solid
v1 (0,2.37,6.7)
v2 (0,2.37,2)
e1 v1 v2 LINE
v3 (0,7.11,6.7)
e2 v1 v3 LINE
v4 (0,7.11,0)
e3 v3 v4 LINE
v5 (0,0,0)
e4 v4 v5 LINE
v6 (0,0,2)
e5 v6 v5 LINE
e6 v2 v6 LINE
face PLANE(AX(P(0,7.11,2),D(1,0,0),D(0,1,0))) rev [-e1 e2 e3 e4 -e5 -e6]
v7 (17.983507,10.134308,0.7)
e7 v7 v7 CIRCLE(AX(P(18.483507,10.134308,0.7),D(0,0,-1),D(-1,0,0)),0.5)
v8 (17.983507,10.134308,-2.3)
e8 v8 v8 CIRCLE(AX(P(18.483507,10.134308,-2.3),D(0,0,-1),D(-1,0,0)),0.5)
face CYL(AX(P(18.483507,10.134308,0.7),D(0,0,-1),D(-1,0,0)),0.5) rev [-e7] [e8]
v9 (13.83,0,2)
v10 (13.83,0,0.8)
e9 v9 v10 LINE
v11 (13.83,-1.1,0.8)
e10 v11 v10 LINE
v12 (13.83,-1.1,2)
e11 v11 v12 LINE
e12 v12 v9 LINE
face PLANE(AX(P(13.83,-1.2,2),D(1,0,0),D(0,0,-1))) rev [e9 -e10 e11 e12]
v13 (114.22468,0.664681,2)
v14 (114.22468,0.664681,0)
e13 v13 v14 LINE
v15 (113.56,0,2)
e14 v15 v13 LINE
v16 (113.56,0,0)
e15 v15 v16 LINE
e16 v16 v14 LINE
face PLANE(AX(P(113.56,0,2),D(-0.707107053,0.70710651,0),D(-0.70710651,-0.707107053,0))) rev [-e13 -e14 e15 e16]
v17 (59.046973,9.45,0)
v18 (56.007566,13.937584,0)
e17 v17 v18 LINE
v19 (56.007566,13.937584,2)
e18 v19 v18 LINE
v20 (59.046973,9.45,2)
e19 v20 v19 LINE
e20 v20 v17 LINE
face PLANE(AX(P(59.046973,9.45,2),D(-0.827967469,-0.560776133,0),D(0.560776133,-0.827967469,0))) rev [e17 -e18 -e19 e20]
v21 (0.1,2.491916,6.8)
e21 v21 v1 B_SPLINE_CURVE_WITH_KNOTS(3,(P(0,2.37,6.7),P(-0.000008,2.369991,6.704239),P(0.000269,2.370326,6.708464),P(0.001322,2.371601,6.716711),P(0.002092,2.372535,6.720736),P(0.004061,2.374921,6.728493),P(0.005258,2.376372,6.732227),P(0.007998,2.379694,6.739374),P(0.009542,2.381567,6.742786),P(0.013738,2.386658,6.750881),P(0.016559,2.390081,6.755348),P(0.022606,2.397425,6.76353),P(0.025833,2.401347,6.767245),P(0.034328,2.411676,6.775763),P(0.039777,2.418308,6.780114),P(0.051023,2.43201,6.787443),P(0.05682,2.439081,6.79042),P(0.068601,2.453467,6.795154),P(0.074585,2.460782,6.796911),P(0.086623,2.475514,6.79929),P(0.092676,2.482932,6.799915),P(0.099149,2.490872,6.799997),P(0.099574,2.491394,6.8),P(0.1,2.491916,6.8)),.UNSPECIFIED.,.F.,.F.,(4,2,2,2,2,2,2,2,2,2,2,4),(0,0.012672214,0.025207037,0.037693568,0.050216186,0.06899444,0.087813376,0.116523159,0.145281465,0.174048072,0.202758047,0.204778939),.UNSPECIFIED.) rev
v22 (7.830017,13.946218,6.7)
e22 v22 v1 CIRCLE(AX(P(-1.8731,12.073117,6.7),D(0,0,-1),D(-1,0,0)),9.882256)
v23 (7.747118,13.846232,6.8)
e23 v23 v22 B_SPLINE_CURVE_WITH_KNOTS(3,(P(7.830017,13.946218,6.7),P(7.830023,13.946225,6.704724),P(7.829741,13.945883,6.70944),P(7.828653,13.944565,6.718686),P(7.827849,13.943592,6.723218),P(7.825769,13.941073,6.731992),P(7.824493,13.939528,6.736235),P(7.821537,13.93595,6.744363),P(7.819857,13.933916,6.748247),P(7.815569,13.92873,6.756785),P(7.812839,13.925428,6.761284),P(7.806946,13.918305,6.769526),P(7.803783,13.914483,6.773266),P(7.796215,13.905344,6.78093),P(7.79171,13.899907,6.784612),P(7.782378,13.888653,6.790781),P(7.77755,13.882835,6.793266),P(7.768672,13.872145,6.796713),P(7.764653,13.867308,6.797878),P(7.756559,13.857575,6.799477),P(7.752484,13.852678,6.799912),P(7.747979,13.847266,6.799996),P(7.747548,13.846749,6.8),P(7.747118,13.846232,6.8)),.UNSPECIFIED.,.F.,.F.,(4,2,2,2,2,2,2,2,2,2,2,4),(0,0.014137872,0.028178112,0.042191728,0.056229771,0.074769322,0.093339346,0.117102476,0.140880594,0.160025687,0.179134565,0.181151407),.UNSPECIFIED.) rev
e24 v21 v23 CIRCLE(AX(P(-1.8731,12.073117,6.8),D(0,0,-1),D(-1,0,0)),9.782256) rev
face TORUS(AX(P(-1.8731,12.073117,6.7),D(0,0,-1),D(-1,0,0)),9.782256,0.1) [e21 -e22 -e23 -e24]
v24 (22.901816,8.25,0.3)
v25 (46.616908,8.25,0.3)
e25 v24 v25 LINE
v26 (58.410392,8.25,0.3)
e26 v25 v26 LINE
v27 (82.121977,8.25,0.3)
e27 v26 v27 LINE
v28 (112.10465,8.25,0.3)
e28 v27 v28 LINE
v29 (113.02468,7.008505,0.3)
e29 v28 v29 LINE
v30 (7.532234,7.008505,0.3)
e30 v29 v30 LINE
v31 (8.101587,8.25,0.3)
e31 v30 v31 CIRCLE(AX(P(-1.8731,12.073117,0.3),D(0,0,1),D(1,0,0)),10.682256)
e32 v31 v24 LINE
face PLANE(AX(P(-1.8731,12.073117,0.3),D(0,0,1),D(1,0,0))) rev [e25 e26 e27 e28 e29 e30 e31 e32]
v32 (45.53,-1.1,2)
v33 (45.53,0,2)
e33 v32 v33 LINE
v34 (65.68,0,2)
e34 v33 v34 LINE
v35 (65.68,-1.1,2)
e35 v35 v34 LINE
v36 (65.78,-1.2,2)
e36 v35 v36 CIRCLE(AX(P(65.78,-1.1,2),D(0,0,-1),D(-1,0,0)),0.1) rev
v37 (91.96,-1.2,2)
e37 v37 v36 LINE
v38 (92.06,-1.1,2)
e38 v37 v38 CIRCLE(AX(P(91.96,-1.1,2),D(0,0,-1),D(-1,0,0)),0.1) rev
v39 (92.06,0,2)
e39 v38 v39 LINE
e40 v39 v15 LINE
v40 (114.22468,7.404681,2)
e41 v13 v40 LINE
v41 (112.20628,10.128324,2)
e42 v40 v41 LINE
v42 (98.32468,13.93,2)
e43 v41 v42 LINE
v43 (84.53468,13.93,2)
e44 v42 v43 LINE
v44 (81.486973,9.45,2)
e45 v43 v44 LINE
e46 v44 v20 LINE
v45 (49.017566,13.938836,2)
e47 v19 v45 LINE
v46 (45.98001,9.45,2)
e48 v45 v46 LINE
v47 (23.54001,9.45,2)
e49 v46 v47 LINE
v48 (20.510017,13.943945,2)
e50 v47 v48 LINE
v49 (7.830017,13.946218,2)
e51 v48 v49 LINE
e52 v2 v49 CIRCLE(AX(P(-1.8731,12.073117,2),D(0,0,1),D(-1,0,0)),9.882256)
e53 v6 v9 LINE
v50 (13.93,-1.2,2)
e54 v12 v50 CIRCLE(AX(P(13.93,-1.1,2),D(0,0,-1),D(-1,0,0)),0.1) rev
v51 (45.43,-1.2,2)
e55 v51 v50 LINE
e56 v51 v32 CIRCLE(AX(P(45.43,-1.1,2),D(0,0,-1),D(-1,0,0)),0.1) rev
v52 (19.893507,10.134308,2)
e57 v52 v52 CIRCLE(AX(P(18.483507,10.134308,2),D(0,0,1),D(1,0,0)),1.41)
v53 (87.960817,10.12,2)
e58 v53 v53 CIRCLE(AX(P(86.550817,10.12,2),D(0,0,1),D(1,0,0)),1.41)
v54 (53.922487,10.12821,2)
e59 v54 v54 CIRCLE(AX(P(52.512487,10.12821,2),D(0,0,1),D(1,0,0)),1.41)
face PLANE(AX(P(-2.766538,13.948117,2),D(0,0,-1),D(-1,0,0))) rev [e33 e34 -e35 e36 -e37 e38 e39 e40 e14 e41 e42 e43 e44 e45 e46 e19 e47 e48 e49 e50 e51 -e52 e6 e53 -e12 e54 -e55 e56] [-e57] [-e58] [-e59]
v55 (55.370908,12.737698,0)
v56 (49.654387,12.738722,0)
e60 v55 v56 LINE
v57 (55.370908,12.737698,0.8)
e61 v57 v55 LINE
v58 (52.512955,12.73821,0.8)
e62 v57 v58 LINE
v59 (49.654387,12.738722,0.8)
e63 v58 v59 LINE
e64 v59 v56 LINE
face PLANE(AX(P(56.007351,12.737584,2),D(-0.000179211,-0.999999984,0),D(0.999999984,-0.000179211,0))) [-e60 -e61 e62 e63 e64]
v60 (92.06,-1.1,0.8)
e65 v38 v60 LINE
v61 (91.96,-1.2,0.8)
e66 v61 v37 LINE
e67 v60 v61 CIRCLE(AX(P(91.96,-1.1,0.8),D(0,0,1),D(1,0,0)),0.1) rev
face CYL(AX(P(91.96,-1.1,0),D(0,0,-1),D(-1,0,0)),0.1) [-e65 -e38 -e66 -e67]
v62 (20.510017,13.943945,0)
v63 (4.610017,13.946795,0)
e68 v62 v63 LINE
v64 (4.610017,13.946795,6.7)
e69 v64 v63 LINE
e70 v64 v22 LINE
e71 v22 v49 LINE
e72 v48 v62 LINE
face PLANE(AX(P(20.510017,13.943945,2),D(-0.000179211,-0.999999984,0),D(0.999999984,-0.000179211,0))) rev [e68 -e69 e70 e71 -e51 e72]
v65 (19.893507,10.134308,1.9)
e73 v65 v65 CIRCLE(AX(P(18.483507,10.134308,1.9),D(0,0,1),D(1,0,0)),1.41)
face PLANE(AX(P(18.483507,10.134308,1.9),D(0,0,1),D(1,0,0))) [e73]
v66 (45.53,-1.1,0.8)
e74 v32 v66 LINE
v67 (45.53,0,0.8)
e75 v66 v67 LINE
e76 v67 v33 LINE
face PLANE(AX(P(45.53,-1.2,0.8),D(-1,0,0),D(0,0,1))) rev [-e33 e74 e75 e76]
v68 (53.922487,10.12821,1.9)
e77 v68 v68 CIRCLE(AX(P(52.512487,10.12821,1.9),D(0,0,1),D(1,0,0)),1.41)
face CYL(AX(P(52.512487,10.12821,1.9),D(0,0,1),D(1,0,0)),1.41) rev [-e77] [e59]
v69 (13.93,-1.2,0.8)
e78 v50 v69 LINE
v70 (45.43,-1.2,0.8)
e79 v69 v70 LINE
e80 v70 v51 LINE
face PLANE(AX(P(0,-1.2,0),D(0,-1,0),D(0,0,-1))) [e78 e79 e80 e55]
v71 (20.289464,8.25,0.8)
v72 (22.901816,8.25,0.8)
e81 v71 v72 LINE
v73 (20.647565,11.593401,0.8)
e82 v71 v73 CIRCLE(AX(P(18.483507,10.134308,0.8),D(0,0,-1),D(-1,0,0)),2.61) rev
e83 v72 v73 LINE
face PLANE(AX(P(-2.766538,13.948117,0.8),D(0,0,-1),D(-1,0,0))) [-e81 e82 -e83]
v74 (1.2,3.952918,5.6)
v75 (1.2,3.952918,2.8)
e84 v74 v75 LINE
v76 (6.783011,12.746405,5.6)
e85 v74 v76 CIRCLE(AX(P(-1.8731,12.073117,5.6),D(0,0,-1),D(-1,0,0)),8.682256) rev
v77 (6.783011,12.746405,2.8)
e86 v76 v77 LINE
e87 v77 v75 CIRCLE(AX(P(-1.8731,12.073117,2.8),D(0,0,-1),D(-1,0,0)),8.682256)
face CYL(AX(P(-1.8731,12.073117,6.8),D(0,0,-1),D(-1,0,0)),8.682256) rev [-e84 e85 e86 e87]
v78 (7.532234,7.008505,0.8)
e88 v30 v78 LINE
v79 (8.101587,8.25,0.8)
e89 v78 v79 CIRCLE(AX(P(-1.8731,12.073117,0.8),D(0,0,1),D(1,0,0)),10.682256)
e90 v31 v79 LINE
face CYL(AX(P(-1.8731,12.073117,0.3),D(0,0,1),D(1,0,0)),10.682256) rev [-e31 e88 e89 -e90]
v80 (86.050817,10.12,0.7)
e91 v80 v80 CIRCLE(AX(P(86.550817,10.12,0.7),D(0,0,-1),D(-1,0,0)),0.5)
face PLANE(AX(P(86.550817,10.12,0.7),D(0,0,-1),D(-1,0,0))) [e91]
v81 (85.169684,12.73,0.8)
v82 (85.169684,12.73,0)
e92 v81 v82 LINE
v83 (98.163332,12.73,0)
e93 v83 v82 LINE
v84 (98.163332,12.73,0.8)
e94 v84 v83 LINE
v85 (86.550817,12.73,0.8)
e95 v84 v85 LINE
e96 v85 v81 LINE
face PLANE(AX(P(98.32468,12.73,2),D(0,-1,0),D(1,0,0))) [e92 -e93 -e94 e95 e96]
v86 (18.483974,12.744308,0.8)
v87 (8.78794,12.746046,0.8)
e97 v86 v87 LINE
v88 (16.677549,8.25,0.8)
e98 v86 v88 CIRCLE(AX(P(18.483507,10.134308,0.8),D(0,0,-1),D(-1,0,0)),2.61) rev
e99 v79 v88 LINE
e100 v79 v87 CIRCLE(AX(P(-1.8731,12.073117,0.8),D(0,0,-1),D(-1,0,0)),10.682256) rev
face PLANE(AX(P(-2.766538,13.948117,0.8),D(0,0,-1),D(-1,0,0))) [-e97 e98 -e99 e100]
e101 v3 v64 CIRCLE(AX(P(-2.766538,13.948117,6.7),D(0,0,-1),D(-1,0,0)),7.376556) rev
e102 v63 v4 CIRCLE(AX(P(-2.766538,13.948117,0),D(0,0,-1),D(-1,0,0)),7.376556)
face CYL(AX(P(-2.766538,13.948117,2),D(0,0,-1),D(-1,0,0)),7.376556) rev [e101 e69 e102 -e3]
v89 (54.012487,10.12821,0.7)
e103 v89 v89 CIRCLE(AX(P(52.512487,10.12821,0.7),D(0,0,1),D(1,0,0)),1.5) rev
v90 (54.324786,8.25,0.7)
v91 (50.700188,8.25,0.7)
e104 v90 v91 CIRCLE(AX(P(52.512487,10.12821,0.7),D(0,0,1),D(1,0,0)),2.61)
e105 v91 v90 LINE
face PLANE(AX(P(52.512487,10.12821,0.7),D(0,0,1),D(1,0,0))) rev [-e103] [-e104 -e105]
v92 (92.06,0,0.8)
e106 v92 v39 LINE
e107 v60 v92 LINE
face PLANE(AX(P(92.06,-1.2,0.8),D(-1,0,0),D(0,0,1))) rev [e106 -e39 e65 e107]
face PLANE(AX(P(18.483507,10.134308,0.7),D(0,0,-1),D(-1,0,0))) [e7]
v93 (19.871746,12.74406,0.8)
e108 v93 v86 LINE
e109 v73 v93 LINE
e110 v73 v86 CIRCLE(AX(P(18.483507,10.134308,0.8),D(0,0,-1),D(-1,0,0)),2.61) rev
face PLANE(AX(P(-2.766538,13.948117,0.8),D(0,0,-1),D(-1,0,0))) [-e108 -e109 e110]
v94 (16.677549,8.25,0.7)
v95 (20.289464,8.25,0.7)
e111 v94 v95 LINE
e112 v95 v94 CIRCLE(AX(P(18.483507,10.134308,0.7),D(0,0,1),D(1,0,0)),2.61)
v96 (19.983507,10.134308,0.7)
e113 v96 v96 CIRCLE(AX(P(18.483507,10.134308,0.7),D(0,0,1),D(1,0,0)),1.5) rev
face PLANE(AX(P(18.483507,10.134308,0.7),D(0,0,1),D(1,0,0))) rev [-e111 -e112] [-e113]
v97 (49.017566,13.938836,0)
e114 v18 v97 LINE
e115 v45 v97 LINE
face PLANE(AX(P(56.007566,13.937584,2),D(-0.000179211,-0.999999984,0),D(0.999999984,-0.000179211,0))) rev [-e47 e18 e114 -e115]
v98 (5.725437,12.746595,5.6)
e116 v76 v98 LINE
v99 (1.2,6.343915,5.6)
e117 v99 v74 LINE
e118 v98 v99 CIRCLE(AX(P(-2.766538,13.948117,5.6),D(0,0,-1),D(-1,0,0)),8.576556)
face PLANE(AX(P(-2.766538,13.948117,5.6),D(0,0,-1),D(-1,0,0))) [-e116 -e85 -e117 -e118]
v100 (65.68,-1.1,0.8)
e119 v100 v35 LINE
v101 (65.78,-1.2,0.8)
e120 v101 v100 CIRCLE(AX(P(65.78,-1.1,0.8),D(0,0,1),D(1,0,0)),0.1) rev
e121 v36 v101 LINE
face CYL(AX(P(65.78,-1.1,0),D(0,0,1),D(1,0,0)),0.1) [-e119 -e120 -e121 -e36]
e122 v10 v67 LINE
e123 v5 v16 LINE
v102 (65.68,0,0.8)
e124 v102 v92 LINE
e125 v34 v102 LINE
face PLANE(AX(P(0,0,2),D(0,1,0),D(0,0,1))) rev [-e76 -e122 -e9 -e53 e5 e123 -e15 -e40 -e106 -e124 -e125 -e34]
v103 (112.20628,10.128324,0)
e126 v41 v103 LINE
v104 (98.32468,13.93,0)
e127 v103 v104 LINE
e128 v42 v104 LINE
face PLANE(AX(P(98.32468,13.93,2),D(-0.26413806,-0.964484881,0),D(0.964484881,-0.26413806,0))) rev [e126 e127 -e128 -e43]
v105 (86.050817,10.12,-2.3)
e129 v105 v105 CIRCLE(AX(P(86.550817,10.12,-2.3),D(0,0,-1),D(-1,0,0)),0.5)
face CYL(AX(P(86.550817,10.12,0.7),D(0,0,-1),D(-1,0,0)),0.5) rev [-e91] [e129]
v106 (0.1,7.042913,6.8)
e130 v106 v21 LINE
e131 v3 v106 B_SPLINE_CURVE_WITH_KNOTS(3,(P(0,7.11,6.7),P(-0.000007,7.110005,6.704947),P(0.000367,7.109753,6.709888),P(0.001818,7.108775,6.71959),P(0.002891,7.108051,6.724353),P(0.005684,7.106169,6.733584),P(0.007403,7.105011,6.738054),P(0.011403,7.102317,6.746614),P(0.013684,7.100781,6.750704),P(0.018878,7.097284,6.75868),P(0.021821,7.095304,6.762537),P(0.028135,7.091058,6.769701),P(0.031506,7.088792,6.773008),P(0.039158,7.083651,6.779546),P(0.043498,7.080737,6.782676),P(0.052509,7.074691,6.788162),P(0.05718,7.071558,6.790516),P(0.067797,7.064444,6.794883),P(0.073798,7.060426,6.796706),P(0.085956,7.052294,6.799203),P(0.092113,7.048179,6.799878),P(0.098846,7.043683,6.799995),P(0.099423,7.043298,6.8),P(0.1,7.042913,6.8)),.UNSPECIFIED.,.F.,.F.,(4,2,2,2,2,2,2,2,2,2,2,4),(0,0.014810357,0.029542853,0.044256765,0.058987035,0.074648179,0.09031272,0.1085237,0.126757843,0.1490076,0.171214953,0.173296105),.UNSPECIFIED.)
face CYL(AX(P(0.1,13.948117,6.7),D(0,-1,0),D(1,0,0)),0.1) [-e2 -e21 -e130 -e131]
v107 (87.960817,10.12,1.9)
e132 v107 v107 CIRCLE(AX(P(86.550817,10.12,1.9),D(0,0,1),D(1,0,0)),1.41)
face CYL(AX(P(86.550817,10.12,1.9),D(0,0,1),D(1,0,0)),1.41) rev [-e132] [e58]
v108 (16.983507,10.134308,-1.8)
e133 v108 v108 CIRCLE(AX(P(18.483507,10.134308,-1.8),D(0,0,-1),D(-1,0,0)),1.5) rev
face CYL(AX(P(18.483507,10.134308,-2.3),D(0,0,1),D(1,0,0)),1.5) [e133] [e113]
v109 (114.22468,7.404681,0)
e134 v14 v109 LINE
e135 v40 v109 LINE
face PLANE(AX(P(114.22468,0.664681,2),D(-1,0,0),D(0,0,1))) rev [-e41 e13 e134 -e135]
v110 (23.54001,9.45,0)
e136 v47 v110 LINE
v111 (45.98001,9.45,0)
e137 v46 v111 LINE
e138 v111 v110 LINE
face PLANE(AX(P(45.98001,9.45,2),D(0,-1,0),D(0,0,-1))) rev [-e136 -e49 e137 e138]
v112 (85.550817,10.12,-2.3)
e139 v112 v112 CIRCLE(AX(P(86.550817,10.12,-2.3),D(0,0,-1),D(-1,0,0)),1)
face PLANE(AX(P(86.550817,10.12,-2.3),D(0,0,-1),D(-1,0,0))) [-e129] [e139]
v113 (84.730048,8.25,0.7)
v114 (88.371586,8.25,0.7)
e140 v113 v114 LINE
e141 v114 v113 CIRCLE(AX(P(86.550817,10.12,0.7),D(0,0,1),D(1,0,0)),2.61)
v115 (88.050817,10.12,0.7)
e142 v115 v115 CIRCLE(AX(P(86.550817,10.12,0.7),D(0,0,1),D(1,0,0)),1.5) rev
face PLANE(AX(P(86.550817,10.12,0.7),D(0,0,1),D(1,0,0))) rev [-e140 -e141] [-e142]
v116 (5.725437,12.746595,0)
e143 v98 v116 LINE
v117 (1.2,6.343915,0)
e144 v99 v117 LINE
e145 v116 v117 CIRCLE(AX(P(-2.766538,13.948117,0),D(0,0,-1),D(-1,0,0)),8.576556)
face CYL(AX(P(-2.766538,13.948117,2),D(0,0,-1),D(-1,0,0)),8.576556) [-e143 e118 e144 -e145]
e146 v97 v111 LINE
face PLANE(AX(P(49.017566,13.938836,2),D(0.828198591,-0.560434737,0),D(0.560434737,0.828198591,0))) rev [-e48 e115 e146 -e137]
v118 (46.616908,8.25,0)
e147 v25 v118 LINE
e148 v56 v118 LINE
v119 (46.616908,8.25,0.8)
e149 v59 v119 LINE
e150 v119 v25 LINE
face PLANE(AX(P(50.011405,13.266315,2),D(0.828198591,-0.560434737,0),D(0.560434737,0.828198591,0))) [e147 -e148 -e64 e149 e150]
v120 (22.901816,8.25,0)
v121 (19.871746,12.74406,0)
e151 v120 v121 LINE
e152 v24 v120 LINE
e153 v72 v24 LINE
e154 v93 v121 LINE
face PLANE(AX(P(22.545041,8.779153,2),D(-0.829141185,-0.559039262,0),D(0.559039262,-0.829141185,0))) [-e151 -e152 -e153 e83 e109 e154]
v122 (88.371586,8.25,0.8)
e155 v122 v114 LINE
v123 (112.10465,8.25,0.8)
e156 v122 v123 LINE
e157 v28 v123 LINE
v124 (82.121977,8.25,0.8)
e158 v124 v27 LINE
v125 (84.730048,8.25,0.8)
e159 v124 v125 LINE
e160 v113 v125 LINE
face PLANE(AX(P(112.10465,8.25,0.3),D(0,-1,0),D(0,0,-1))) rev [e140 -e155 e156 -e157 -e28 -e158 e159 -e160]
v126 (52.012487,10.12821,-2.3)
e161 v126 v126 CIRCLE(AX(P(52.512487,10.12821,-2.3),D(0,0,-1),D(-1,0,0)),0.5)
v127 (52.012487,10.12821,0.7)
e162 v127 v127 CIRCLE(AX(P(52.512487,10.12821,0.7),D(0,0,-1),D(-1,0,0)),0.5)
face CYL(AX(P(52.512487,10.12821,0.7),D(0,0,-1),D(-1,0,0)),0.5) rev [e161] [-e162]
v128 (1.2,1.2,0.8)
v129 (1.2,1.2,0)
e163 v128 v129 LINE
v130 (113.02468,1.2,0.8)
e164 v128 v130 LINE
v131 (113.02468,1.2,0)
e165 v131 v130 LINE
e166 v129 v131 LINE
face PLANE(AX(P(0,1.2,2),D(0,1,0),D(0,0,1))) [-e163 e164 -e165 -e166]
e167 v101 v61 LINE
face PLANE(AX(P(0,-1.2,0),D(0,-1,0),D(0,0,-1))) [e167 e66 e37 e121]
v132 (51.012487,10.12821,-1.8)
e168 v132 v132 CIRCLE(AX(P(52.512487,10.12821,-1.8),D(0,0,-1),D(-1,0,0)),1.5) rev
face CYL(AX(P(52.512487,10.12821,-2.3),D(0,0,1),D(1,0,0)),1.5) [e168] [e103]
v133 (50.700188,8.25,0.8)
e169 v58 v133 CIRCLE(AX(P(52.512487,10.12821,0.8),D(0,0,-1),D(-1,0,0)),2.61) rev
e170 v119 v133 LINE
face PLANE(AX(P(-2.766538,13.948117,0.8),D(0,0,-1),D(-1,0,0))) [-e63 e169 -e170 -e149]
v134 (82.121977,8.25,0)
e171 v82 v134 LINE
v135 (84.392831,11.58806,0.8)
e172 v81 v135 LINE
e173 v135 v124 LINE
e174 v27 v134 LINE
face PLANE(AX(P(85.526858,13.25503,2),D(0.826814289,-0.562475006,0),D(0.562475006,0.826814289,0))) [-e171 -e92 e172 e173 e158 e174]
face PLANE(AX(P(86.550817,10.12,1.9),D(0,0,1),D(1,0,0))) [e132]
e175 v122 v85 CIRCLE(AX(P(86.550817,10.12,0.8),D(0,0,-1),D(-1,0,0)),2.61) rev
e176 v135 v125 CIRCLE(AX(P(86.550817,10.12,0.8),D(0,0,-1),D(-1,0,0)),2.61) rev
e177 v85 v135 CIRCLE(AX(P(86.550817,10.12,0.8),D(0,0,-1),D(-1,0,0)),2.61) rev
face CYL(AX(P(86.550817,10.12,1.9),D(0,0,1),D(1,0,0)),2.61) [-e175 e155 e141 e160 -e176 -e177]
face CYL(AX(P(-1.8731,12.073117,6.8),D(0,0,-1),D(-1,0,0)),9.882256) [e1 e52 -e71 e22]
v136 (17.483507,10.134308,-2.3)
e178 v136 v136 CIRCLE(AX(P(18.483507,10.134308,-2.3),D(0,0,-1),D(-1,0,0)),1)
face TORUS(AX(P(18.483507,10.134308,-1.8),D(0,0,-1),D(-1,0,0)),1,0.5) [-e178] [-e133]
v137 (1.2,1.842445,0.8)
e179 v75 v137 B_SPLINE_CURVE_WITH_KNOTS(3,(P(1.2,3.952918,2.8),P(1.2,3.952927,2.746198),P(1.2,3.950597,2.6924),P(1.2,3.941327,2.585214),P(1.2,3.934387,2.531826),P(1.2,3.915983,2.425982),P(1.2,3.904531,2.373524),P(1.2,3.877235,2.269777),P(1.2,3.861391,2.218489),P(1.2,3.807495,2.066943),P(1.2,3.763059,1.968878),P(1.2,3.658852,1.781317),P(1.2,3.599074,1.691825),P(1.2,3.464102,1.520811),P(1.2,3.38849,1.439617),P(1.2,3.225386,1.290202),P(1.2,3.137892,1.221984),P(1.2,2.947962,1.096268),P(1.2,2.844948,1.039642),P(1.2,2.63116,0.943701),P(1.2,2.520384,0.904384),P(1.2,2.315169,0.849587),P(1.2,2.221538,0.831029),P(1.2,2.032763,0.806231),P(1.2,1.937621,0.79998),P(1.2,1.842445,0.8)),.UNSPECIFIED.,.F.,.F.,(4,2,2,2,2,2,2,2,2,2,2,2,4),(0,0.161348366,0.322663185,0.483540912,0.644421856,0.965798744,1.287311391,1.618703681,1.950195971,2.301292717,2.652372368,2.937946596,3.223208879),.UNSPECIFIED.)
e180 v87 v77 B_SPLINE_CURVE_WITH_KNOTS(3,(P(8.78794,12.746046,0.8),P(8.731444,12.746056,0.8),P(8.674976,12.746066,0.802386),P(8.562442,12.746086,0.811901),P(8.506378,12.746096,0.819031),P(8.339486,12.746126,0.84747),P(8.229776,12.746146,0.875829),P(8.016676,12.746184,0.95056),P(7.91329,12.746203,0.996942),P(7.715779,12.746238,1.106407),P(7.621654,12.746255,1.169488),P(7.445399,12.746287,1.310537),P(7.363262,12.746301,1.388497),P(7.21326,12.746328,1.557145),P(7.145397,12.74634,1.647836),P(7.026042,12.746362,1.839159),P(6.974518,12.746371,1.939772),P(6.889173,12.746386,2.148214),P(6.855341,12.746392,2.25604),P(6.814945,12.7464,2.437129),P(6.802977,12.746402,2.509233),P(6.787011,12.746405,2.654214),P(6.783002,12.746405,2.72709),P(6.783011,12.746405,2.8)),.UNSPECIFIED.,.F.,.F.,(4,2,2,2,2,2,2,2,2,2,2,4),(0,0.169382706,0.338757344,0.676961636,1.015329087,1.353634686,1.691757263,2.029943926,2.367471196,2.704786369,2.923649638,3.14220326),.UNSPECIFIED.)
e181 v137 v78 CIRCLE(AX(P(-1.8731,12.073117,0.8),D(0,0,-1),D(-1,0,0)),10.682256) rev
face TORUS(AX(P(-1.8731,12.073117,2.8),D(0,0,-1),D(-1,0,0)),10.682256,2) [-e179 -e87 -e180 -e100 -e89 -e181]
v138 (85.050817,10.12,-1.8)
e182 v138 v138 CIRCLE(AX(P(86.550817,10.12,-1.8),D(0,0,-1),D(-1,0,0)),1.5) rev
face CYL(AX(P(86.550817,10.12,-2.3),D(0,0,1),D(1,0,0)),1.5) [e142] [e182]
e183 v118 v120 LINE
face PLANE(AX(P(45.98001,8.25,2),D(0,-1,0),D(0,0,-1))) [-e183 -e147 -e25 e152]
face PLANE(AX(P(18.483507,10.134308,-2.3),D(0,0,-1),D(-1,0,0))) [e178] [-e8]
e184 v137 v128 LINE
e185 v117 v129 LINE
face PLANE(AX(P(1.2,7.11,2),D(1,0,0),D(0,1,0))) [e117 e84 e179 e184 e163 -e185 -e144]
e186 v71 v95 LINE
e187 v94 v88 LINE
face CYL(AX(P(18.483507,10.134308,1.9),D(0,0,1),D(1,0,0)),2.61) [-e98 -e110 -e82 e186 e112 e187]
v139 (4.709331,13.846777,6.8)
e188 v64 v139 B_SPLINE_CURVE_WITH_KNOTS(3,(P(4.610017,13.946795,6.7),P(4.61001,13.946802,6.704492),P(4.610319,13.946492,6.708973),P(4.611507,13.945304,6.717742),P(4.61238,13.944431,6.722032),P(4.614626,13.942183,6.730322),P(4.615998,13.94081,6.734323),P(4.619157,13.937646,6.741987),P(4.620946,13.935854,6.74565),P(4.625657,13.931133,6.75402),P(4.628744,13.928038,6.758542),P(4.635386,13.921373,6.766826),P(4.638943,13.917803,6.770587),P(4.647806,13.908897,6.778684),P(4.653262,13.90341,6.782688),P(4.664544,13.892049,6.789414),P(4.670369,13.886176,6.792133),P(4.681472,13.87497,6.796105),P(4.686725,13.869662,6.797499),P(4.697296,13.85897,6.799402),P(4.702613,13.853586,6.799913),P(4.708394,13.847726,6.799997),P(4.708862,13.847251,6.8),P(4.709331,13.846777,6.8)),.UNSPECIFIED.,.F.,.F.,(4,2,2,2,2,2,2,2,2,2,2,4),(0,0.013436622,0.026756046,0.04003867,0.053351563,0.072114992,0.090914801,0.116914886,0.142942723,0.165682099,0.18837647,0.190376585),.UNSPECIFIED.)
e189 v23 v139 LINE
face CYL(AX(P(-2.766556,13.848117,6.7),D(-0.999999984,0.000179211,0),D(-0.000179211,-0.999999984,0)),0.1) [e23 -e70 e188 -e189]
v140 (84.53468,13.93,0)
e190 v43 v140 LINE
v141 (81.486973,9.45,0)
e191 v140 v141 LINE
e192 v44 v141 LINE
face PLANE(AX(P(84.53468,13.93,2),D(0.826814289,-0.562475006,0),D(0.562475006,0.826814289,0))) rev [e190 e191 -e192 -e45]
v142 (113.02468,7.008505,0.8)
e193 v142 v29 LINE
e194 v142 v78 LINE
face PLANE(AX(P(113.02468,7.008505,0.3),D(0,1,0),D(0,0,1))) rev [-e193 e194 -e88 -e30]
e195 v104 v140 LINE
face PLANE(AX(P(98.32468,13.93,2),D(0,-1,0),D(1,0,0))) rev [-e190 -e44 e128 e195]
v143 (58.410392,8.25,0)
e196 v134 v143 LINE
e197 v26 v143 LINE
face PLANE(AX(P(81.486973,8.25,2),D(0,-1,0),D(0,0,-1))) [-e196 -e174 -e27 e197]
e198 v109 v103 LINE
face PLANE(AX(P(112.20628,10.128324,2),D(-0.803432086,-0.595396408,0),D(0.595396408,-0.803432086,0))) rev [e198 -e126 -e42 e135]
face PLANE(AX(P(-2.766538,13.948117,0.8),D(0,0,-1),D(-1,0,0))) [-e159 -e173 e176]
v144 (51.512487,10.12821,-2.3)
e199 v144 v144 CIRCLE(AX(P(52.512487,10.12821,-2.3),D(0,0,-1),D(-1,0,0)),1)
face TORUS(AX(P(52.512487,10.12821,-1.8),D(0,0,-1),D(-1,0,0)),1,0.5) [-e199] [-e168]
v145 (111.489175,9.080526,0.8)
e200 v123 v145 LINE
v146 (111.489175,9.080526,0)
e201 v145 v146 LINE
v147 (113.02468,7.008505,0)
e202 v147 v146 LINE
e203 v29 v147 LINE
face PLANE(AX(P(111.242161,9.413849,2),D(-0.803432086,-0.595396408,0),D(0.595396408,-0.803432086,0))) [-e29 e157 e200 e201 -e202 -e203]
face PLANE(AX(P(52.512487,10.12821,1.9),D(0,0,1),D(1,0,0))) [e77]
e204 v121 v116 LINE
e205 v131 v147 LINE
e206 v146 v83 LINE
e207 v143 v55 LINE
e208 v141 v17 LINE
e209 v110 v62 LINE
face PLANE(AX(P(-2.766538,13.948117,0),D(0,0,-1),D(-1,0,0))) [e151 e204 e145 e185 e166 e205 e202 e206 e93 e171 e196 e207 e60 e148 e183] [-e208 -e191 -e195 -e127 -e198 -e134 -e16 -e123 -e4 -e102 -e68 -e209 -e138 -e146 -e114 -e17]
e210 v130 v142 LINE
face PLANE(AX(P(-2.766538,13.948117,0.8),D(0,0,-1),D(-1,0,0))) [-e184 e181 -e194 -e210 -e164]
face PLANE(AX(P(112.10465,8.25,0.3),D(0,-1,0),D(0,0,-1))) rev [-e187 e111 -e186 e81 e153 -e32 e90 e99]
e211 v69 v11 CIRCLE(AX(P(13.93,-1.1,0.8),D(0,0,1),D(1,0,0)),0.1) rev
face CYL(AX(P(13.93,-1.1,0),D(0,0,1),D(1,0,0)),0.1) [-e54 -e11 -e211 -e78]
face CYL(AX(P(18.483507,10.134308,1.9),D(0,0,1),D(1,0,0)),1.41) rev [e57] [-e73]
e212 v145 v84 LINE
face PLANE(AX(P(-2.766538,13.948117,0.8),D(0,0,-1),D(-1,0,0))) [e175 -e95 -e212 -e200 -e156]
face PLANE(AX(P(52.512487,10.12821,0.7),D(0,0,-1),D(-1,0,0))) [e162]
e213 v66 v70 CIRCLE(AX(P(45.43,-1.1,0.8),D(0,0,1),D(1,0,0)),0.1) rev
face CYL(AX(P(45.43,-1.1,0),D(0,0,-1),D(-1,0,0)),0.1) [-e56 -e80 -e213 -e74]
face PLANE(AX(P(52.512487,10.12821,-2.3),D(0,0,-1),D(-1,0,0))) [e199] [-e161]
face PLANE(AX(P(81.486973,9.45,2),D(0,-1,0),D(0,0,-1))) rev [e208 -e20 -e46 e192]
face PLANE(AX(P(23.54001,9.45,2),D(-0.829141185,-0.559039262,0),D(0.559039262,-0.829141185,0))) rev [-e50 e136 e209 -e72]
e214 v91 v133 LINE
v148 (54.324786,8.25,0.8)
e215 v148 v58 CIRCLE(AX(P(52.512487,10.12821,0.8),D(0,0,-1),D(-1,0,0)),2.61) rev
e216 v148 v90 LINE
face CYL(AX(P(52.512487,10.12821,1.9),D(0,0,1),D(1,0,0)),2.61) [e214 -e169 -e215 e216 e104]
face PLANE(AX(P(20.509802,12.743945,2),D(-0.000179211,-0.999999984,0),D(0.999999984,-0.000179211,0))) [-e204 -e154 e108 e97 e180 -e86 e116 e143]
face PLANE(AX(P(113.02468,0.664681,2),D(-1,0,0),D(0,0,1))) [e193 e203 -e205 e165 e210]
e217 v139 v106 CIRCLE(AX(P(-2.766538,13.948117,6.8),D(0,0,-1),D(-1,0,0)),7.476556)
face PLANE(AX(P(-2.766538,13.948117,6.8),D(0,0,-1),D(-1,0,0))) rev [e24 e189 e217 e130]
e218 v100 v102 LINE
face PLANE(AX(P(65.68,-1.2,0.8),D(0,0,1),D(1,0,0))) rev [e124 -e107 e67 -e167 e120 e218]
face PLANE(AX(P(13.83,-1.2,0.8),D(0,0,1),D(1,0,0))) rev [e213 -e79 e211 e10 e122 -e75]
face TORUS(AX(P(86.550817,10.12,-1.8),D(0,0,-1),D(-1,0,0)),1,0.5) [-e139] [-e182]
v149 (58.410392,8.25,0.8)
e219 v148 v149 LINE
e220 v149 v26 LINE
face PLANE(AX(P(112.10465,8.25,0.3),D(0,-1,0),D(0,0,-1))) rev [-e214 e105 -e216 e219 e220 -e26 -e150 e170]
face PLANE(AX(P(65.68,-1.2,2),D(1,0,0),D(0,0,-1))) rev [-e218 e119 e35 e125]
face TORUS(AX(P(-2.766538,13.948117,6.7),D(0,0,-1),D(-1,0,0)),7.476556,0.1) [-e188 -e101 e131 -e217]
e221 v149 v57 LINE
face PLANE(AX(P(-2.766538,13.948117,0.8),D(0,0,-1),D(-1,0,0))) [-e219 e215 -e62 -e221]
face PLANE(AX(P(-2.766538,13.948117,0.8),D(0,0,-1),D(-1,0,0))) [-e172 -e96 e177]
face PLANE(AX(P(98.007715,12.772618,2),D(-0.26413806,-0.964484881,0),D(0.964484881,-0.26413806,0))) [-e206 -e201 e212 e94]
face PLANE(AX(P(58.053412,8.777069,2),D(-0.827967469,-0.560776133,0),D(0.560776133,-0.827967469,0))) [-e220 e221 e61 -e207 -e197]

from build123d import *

# Parameters (mm, degrees)
BOSS_EXTRUDE1_DEPTH  = 2
SKETCH6_W            = 31.7
SKETCH6_H            = 1.1999999999999997
BOSS_EXTRUDE2_DEPTH  = 1.2
BOSS_EXTRUDE3_DEPTH  = 1.2
SKETCH4_R            = 1.4099999999999993
SKETCH4_R_2          = 1.4100000000000028
SKETCH4_R_3          = 1.409999999999999
CUT_EXTRUDE6_DEPTH   = 0.1
BOSS_EXTRUDE11_DEPTH = 4.8
SHELL10_DEPTH        = 0.8
SHELL10_START        = 0.8
SHELL10_2_DEPTH      = 4.8
SHELL10_3_OUTLINE_R  = 2.61
SHELL10_3_DEPTH      = 0.7
FILLET2_R            = 2
BOSS_EXTRUDE12_DEPTH = 0.5
SKETCH27_R           = 1.5000000000000042
BOSS_EXTRUDE13_DEPTH = 3
FILLET3_R            = 0.5
SKETCH32_R           = 1.4999999999999973
BOSS_EXTRUDE14_DEPTH = 3
FILLET4_R            = 0.5
SKETCH33_R           = 1.5000000000000009
BOSS_EXTRUDE15_DEPTH = 3
FILLET5_R            = 0.5
SKETCH34_R           = 0.49999999999999917
CUT_EXTRUDE7_DEPTH   = 3
SKETCH35_R           = 0.49999999999999917
CUT_EXTRUDE8_DEPTH   = 3
SKETCH36_R           = 0.49999999999999917
CUT_EXTRUDE9_DEPTH   = 3
FILLET7_R            = 0.1
FILLET8_R            = 0.1
FILLET9_R            = 0.1
FILLET10_R           = 0.1
FILLET11_R           = 0.1


with BuildPart() as part:
    # Sketch1 → Boss-Extrude1 (new body)
    with BuildSketch(Plane.XY):
        with BuildLine():
            Line((0, 0), (113.56, 0))
            Line((113.56, 0), (114.2246801189894, 0.6646806296412225))
            Line((114.2246801189894, 0.6646806296412225), (114.2246801189894, 7.4046806296412235))
            Line((114.2246801189894, 7.4046806296412235), (112.20627968421682, 10.128324324324318))
            Line((112.20627968421682, 10.128324324324318), (98.32468037431536, 13.93))
            Line((98.32468037431536, 13.93), (84.53468037431537, 13.930000000000003))
            Line((84.53468037431537, 13.930000000000003), (81.48697297298213, 9.450000000000003))
            Line((81.48697297298213, 9.450000000000003), (59.046972972982125, 9.450000000000003))
            Line((59.046972972982125, 9.450000000000003), (56.00756633365256, 13.93758367953171))
            Line((56.00756633365256, 13.93758367953171), (49.017566333652546, 13.938836362308603))
            Line((49.017566333652546, 13.938836362308603), (45.980010060525075, 9.450000000000003))
            Line((45.980010060525075, 9.450000000000003), (23.54001006052507, 9.450000000000003))
            Line((23.54001006052507, 9.450000000000003), (20.510017262013168, 13.94394522006733))
            Line((20.510017262013168, 13.94394522006733), (4.610017262013166, 13.946794670160694))
            ThreePointArc((4.610017262013166, 13.946794670160694), (3.3495085223409222, 9.824096158647764), (-8e-17, 7.11))
            Line((-8e-17, 7.11), (0, 0))
        make_face()
    extrude(amount=BOSS_EXTRUDE1_DEPTH)

    # Sketch6 → Boss-Extrude2 (add)
    with BuildSketch(Plane.XZ):
        with Locations((29.68, 1.4000000000000001)):
            Rectangle(SKETCH6_W, SKETCH6_H)
    extrude(amount=BOSS_EXTRUDE2_DEPTH)

    # Sketch7 → Boss-Extrude3 (add)
    with BuildSketch(Plane(origin=(0, 0, 0), x_dir=(-1, 0, 0), z_dir=(0, -1, 0))):
        Polygon((-65.68, -2), (-92.06, -2), (-92.06, -0.8000000000000034), (-65.68, -0.8000000000000002), align=None)
    extrude(amount=BOSS_EXTRUDE3_DEPTH)

    # Sketch4 → Cut-Extrude6 (cut)
    with BuildSketch(Plane.XY.offset(2)):
        with Locations((52.51248680065845, 10.128209973991437)):
            Circle(SKETCH4_R)
        with Locations((18.483506653624264, 10.134308331265466)):
            Circle(SKETCH4_R_2)
        with Locations((86.55081658593453, 10.120000000000001)):
            Circle(SKETCH4_R_3)
    extrude(amount=-CUT_EXTRUDE6_DEPTH, mode=Mode.SUBTRACT)

    # Sketch18 → Boss-Extrude11 (add)
    with BuildSketch(Plane.XY.offset(2)):
        with BuildLine():
            Line((4.610017262013166, 13.946794670160694), (7.8300172620131665, 13.946217611714113))
            ThreePointArc((7.8300172620131665, 13.946217611714113), (6.3125217988837115, 6.53645913408641), (8.7e-16, 2.3700000000000006))
            Line((8.7e-16, 2.3700000000000006), (8.7e-16, 7.110000000000001))
            ThreePointArc((8.7e-16, 7.110000000000001), (3.3495085223409227, 9.824096158647766), (4.610017262013166, 13.946794670160694))
        make_face()
    extrude(amount=BOSS_EXTRUDE11_DEPTH)

    # Shell10: read off the stored shape, not the designer's step
    # Shell10 outline → Shell10 (cut)
    # profile 1 of 4: a face of its own
    with BuildSketch(Plane.XY):
        with BuildLine():
            Line((52.512954541, 12.738209932), (49.654387443, 12.738722218))
            Line((49.654387443, 12.738722218), (46.61690841, 8.25))
            Line((46.61690841, 8.25), (22.901816113, 8.25))
            Line((22.901816113, 8.25), (20.647565145, 11.593400804))
            ThreePointArc((20.647565145, 11.593400804), (20.979532762, 10.89716721), (21.093506654, 10.134308331))
            ThreePointArc((21.093506654, 10.134308331), (16.637792591, 8.288925011), (18.483974394, 12.744308289))
            Line((18.483974394, 12.744308289), (6.783010982, 12.746405227))
            ThreePointArc((6.783010982, 12.746405227), (5.456630529, 7.419449569), (1.2, 3.952918417))
            Line((1.2, 3.952918417), (1.2, 1.2))
            Line((1.2, 1.2), (113.024680119, 1.2))
            Line((113.024680119, 1.2), (113.024680119, 7.008505085))
            Line((113.024680119, 7.008505085), (111.489175152, 9.080526251))
            Line((111.489175152, 9.080526251), (98.163332392, 12.73))
            Line((98.163332392, 12.73), (86.550816586, 12.73))
            ThreePointArc((86.550816586, 12.73), (88.396365285, 11.965548699), (89.160816586, 10.12))
            ThreePointArc((89.160816586, 10.12), (85.782780654, 7.625562026), (84.392831293, 11.588059766))
            Line((84.392831293, 11.588059766), (82.121976504, 8.25))
            Line((82.121976504, 8.25), (58.410391633, 8.25))
            Line((58.410391633, 8.25), (55.37090773, 12.737697756))
            Line((55.37090773, 12.737697756), (52.512954541, 12.738209932))
        make_face()
        with BuildLine():
            ThreePointArc((55.122486801, 10.128209974), (50.666772738, 8.282826654), (52.512954541, 12.738209932))
            ThreePointArc((52.512954541, 12.738209932), (54.358200863, 11.973593294), (55.122486801, 10.128209974))
        make_face(mode=Mode.SUBTRACT)
    # profile 2 of 4: a face of its own
    with BuildSketch(Plane.XY):
        with BuildLine():
            ThreePointArc((18.483974394, 12.744308289), (19.709247434, 12.438578181), (20.647565145, 11.593400804))
            Line((20.647565145, 11.593400804), (19.871746204, 12.744059586))
            Line((19.871746204, 12.744059586), (18.483974394, 12.744308289))
        make_face()
    # profile 3 of 4: a face of its own
    with BuildSketch(Plane.XY):
        with BuildLine():
            Line((85.169683906, 12.73), (84.392831293, 11.588059766))
            ThreePointArc((84.392831293, 11.588059766), (85.330065995, 12.426917422), (86.550816586, 12.73))
            Line((86.550816586, 12.73), (85.169683906, 12.73))
        make_face()
    # profile 4 of 4: a face of its own
    with BuildSketch(Plane.XY):
        with BuildLine():
            ThreePointArc((1.2, 3.952918417), (5.456630529, 7.419449569), (6.783010982, 12.746405227))
            Line((6.783010982, 12.746405227), (5.725437473, 12.746594756))
            ThreePointArc((5.725437473, 12.746594756), (4.237190705, 8.997855303), (1.2, 6.34391511))
            Line((1.2, 6.34391511), (1.2, 3.952918417))
        make_face()
    extrude(amount=SHELL10_DEPTH, mode=Mode.SUBTRACT)

    # Shell10 2 outline → Shell10 2 (cut)
    with BuildSketch(Plane.XY.offset(SHELL10_START)):
        with BuildLine():
            ThreePointArc((1.2, 3.952918417), (5.456630529, 7.419449569), (6.783010982, 12.746405227))
            Line((6.783010982, 12.746405227), (5.725437473, 12.746594756))
            ThreePointArc((5.725437473, 12.746594756), (4.237190705, 8.997855303), (1.2, 6.34391511))
            Line((1.2, 6.34391511), (1.2, 3.952918417))
        make_face()
    extrude(amount=SHELL10_2_DEPTH, mode=Mode.SUBTRACT)

    # Shell10 3 outline → Shell10 3 (cut)
    with BuildSketch(Plane.XY):
        with Locations((52.512486801, 10.128209974)):
            Circle(SHELL10_3_OUTLINE_R)
        with Locations((18.483506654, 10.134308331)):
            Circle(SHELL10_3_OUTLINE_R)
        with Locations((86.550816586, 10.12)):
            Circle(SHELL10_3_OUTLINE_R)
    extrude(amount=SHELL10_3_DEPTH, mode=Mode.SUBTRACT)

    # Fillet2
    fillet2_edges = [part.edges().sort_by_distance(p)[0] for p in [
        (5.456630529005078, 7.419449569008004, 0.8),
    ]]
    fillet(fillet2_edges, radius=FILLET2_R)

    # Sketch19 → Boss-Extrude12 (add)
    with BuildSketch(Plane(origin=(0, 0, 0.8000000000000002), x_dir=(-1, 0, 0), z_dir=(0, 0, -1))):
        with BuildLine():
            Line((-112.10465013060012, 8.250000000000004), (-113.0246801189894, 7.008505084706755))
            Line((-113.0246801189894, 7.008505084706755), (-7.532233645801631, 7.008505084706755))
            ThreePointArc((-7.532233645801631, 7.008505084706755), (-7.836772464238917, 7.620143611633395), (-8.101586568073918, 8.250000000000004))
            Line((-8.101586568073918, 8.250000000000004), (-112.10465013060012, 8.250000000000004))
        make_face()
    extrude(amount=BOSS_EXTRUDE12_DEPTH)

    # Sketch27 → Boss-Extrude13 (add)
    with BuildSketch(Plane(origin=(0, 0, 0.7000000000000001), x_dir=(-1, 0, 0), z_dir=(0, 0, -1))):
        with Locations(Location((-52.51248680065845, 10.128209973991437, 0), (0, 0, 180))):
            Circle(SKETCH27_R)
    extrude(amount=BOSS_EXTRUDE13_DEPTH)

    # Fillet3
    fillet3_edges = [part.edges().sort_by_distance(p)[0] for p in [
        (51.01248680065844, 10.128209973991437, -2.3),
    ]]
    fillet(fillet3_edges, radius=FILLET3_R)

    # Sketch32 → Boss-Extrude14 (add)
    with BuildSketch(Plane(origin=(0, 0, 0.7000000000000001), x_dir=(-1, 0, 0), z_dir=(0, 0, -1))):
        with Locations(Location((-86.55081658593453, 10.120000000000001, 0), (0, 0, 180))):
            Circle(SKETCH32_R)
    extrude(amount=BOSS_EXTRUDE14_DEPTH)

    # Fillet4
    fillet4_edges = [part.edges().sort_by_distance(p)[0] for p in [
        (85.05081658593453, 10.120000000000001, -2.3),
    ]]
    fillet(fillet4_edges, radius=FILLET4_R)

    # Sketch33 → Boss-Extrude15 (add)
    with BuildSketch(Plane(origin=(0, 0, 0.7000000000000001), x_dir=(-1, 0, 0), z_dir=(0, 0, -1))):
        with Locations(Location((-18.483506653624264, 10.134308331265466, 0), (0, 0, 180))):
            Circle(SKETCH33_R)
    extrude(amount=BOSS_EXTRUDE15_DEPTH)

    # Fillet5
    fillet5_edges = [part.edges().sort_by_distance(p)[0] for p in [
        (16.983506653624264, 10.134308331265466, -2.3),
    ]]
    fillet(fillet5_edges, radius=FILLET5_R)

    # Sketch34 → Cut-Extrude7 (cut)
    with BuildSketch(Plane(origin=(0, 0, -2.3), x_dir=(-1, 0, 0), z_dir=(0, 0, -1))):
        with Locations((-52.51248680065845, 10.128209973991437)):
            Circle(SKETCH34_R)
    extrude(amount=-CUT_EXTRUDE7_DEPTH, mode=Mode.SUBTRACT)

    # Sketch35 → Cut-Extrude8 (cut)
    with BuildSketch(Plane(origin=(0, 0, -2.3), x_dir=(-1, 0, 0), z_dir=(0, 0, -1))):
        with Locations((-18.483506653624264, 10.134308331265466)):
            Circle(SKETCH35_R)
    extrude(amount=-CUT_EXTRUDE8_DEPTH, mode=Mode.SUBTRACT)

    # Sketch36 → Cut-Extrude9 (cut)
    with BuildSketch(Plane(origin=(0, 0, -2.3), x_dir=(-1, 0, 0), z_dir=(0, 0, -1))):
        with Locations((-86.55081658593453, 10.120000000000001)):
            Circle(SKETCH36_R)
    extrude(amount=-CUT_EXTRUDE9_DEPTH, mode=Mode.SUBTRACT)

    # Fillet7
    fillet7_edges = [part.edges().sort_by_distance(p)[0] for p in [
        (3.3495085223409236, 9.824096158647766, 6.8),
        (8.7e-16, 4.74, 6.8),
        (6.312521798883712, 6.536459134086408, 6.8),
        (6.220017262013166, 13.946506140937403, 6.8),
    ]]
    fillet(fillet7_edges, radius=FILLET7_R)

    # Fillet8
    fillet8_edges = [part.edges().sort_by_distance(p)[0] for p in [
        (13.83, -1.2, 1.4),
    ]]
    fillet(fillet8_edges, radius=FILLET8_R)

    # Fillet9
    fillet9_edges = [part.edges().sort_by_distance(p)[0] for p in [
        (92.06, -1.2, 1.4000000000000017),
    ]]
    fillet(fillet9_edges, radius=FILLET9_R)

    # Fillet10
    fillet10_edges = [part.edges().sort_by_distance(p)[0] for p in [
        (65.68, -1.2, 1.4),
    ]]
    fillet(fillet10_edges, radius=FILLET10_R)

    # Fillet11
    fillet11_edges = [part.edges().sort_by_distance(p)[0] for p in [
        (45.53, -1.2, 1.4000000000000001),
    ]]
    fillet(fillet11_edges, radius=FILLET11_R)


solid = part.part
